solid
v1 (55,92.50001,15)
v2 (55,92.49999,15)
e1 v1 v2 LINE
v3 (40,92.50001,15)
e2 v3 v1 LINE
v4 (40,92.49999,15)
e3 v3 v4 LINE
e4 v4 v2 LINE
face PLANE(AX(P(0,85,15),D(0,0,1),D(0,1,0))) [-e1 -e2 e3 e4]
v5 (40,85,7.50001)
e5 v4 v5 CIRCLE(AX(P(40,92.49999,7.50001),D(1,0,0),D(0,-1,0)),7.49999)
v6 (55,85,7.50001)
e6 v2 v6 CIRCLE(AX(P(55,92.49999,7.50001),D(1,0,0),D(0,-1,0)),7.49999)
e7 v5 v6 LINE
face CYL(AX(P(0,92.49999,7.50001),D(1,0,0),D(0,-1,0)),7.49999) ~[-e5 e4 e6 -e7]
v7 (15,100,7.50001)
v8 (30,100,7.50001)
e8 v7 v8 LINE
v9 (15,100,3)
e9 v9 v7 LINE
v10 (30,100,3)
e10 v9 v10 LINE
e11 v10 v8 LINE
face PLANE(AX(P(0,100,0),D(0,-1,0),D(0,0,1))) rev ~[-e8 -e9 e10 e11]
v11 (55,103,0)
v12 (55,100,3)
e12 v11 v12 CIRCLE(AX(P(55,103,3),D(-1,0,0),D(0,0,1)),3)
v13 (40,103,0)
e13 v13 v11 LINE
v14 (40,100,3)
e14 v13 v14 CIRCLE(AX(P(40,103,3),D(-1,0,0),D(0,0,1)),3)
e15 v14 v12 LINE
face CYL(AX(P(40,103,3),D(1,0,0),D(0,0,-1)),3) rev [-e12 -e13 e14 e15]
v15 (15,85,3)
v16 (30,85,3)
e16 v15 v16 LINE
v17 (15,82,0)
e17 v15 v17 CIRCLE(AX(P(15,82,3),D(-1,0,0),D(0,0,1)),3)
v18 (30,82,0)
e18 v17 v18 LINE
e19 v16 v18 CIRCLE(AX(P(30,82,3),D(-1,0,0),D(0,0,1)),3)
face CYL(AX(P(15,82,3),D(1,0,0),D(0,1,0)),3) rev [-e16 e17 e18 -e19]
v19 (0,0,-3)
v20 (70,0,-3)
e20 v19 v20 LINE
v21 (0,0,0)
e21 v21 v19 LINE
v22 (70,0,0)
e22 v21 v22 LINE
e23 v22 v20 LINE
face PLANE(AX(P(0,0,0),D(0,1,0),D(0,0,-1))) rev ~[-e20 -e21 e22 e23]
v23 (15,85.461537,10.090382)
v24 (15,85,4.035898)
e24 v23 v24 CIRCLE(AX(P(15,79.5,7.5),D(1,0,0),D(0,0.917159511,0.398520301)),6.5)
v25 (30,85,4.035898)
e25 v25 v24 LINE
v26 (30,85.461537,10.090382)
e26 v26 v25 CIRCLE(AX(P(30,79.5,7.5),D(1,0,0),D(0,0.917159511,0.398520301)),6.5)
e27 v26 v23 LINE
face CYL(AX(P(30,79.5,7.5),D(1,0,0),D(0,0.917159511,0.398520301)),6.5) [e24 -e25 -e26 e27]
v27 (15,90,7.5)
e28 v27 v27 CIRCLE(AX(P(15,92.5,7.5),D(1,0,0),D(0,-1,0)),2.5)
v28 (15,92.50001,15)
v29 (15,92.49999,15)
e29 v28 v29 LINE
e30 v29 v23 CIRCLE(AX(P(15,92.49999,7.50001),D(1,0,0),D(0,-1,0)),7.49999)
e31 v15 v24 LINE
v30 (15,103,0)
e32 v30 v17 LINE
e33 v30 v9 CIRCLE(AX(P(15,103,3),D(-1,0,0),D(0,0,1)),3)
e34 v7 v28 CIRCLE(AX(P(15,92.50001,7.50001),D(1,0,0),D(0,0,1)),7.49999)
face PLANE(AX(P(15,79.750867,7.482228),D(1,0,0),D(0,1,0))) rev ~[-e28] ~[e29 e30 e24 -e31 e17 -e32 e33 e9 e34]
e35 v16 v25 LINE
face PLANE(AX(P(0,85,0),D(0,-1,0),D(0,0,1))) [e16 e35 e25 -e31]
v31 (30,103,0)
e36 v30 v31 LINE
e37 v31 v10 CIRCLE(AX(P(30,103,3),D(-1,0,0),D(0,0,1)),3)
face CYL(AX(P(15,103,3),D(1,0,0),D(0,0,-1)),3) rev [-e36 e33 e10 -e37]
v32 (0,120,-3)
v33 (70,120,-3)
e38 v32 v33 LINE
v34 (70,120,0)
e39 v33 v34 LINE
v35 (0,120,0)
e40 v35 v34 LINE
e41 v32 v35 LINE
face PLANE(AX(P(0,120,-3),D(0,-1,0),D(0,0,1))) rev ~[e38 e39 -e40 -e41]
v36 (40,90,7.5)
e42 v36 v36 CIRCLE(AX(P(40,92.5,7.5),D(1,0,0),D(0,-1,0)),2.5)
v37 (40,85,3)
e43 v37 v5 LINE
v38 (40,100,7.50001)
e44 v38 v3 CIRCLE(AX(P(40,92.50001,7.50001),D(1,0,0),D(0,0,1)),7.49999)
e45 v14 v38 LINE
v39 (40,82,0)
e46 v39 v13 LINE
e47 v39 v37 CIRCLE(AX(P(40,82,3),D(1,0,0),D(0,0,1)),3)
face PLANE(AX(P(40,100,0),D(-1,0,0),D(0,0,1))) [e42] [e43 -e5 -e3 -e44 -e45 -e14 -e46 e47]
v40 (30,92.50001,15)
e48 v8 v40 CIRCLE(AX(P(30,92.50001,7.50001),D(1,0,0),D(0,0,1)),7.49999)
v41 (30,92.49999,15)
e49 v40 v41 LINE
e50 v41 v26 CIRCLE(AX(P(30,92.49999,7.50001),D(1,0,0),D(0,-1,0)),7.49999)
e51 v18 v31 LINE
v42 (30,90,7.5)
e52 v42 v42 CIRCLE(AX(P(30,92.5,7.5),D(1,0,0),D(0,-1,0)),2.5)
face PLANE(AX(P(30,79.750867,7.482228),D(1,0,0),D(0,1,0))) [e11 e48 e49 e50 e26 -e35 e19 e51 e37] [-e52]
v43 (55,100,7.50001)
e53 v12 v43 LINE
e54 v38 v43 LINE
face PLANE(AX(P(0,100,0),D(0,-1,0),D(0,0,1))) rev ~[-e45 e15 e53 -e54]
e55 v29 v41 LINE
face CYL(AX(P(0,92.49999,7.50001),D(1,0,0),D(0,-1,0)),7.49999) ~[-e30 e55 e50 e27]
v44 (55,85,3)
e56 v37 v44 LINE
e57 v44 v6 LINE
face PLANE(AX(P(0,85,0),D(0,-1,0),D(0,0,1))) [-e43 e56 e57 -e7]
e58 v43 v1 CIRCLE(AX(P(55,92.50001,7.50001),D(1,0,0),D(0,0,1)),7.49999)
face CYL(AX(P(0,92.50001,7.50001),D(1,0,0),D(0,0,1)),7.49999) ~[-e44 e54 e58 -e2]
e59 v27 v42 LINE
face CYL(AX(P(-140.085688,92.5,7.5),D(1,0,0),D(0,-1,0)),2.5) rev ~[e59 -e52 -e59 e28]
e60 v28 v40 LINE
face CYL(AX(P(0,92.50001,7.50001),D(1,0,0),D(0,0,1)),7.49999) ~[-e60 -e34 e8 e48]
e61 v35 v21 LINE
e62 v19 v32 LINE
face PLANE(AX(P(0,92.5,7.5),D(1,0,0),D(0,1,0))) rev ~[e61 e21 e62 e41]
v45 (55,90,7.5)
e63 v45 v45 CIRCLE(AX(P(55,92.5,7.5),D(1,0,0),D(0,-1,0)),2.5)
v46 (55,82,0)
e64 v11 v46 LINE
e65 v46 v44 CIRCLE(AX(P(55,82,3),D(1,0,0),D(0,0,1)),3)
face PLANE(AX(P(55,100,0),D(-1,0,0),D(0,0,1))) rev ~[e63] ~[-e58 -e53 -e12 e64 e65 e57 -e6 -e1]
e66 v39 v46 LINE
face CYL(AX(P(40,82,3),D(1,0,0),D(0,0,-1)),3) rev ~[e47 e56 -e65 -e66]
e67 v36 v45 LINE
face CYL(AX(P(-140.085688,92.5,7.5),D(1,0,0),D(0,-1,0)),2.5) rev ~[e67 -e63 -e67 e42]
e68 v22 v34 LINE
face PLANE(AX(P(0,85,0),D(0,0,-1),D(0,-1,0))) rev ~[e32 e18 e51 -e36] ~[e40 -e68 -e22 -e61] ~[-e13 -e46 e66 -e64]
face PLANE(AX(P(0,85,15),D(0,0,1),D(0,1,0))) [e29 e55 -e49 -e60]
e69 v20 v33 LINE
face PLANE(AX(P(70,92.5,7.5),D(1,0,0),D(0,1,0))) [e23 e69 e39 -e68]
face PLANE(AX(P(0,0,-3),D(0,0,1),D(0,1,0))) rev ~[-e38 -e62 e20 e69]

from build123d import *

# Parameters (mm, degrees)
F0_W     = 15
F0_H     = 15
F1_DEPTH = 70
F2_D     = 5
F4_R     = 7.49999
F3_W     = 15
F3_H     = 15
F3_W_2   = 10
F5_DEPTH = 15
F6_R     = 3
F8_DEPTH = 15


# Not quite as in the source:
# - a fillet or chamfer is up to 0.001 mm smaller than in the source, because OpenCascade refuses the exact size


with BuildPart() as f1:
    # F0 (on Right) → F1 (new body)
    with BuildSketch(Plane.YZ):
        with Locations((92.5, 7.5)):
            Rectangle(F0_W, F0_H)
        Polygon((85, 0), (0, 0), (0, -3), (120, -3), (120, 0), (100, 0), align=None)
    extrude(amount=F1_DEPTH)

    # F2 (through all)
    with Locations(Plane(origin=(0, 0, 0), x_dir=(0, 1, 0), z_dir=(-1, 0, 0))):
        with Locations((92.5, -7.5)):
            Hole(F2_D / 2)

    # F4 (radius 7.5 in the source; OpenCascade refuses exactly that, so slightly less here)
    f4_edges = [f1.edges().sort_by_distance(p)[0] for p in [
        (35, 85, 15),
        (35, 100, 15),
    ]]
    fillet(f4_edges, radius=F4_R)

    # F3 (on face) → F5 (cut, through all)
    with BuildSketch(Plane(origin=(0, 100, 0), x_dir=(-1, 0, 0), z_dir=(0, 1, 0))):
        with Locations((-62.5, 7.5)):
            Rectangle(F3_W, F3_H)
        with Locations((-7.5, 7.5)):
            Rectangle(F3_W, F3_H)
        with Locations((-35, 7.5)):
            Rectangle(F3_W_2, F3_H)
    extrude(amount=-F5_DEPTH, mode=Mode.SUBTRACT)

    # F6
    f6_edges = [f1.edges().sort_by_distance(p)[0] for p in [
        (47.5, 85, 0),
        (22.5, 85, 0),
        (22.5, 100, 0),
        (47.5, 100, 0),
    ]]
    fillet(f6_edges, radius=F6_R)

    # F7 (on face) → F8 (join, through all)
    with BuildSketch(Plane.YZ.offset(30)):
        with BuildLine():
            ThreePointArc((85, 7.50001), (85.1162856981, 8.815593818), (85.461536824, 10.0903819596))
            ThreePointArc((85.461536824, 10.0903819596), (73.0188041666, 7.994065349), (85, 4.0358983849))
            Line((85, 4.0358983849), (85, 7.50001))
        make_face()
        with BuildLine():
            ThreePointArc((85, 4.0358983849), (85.7449979984, 5.6972243623), (86, 7.5))
            ThreePointArc((86, 7.5), (85.8639606125, 8.8228776671), (85.461536824, 10.0903819596))
            ThreePointArc((85.461536824, 10.0903819596), (85.1162856981, 8.815593818), (85, 7.50001))
            Line((85, 7.50001), (85, 4.0358983849))
        make_face()
    extrude(amount=-F8_DEPTH)


solid = f1.part
